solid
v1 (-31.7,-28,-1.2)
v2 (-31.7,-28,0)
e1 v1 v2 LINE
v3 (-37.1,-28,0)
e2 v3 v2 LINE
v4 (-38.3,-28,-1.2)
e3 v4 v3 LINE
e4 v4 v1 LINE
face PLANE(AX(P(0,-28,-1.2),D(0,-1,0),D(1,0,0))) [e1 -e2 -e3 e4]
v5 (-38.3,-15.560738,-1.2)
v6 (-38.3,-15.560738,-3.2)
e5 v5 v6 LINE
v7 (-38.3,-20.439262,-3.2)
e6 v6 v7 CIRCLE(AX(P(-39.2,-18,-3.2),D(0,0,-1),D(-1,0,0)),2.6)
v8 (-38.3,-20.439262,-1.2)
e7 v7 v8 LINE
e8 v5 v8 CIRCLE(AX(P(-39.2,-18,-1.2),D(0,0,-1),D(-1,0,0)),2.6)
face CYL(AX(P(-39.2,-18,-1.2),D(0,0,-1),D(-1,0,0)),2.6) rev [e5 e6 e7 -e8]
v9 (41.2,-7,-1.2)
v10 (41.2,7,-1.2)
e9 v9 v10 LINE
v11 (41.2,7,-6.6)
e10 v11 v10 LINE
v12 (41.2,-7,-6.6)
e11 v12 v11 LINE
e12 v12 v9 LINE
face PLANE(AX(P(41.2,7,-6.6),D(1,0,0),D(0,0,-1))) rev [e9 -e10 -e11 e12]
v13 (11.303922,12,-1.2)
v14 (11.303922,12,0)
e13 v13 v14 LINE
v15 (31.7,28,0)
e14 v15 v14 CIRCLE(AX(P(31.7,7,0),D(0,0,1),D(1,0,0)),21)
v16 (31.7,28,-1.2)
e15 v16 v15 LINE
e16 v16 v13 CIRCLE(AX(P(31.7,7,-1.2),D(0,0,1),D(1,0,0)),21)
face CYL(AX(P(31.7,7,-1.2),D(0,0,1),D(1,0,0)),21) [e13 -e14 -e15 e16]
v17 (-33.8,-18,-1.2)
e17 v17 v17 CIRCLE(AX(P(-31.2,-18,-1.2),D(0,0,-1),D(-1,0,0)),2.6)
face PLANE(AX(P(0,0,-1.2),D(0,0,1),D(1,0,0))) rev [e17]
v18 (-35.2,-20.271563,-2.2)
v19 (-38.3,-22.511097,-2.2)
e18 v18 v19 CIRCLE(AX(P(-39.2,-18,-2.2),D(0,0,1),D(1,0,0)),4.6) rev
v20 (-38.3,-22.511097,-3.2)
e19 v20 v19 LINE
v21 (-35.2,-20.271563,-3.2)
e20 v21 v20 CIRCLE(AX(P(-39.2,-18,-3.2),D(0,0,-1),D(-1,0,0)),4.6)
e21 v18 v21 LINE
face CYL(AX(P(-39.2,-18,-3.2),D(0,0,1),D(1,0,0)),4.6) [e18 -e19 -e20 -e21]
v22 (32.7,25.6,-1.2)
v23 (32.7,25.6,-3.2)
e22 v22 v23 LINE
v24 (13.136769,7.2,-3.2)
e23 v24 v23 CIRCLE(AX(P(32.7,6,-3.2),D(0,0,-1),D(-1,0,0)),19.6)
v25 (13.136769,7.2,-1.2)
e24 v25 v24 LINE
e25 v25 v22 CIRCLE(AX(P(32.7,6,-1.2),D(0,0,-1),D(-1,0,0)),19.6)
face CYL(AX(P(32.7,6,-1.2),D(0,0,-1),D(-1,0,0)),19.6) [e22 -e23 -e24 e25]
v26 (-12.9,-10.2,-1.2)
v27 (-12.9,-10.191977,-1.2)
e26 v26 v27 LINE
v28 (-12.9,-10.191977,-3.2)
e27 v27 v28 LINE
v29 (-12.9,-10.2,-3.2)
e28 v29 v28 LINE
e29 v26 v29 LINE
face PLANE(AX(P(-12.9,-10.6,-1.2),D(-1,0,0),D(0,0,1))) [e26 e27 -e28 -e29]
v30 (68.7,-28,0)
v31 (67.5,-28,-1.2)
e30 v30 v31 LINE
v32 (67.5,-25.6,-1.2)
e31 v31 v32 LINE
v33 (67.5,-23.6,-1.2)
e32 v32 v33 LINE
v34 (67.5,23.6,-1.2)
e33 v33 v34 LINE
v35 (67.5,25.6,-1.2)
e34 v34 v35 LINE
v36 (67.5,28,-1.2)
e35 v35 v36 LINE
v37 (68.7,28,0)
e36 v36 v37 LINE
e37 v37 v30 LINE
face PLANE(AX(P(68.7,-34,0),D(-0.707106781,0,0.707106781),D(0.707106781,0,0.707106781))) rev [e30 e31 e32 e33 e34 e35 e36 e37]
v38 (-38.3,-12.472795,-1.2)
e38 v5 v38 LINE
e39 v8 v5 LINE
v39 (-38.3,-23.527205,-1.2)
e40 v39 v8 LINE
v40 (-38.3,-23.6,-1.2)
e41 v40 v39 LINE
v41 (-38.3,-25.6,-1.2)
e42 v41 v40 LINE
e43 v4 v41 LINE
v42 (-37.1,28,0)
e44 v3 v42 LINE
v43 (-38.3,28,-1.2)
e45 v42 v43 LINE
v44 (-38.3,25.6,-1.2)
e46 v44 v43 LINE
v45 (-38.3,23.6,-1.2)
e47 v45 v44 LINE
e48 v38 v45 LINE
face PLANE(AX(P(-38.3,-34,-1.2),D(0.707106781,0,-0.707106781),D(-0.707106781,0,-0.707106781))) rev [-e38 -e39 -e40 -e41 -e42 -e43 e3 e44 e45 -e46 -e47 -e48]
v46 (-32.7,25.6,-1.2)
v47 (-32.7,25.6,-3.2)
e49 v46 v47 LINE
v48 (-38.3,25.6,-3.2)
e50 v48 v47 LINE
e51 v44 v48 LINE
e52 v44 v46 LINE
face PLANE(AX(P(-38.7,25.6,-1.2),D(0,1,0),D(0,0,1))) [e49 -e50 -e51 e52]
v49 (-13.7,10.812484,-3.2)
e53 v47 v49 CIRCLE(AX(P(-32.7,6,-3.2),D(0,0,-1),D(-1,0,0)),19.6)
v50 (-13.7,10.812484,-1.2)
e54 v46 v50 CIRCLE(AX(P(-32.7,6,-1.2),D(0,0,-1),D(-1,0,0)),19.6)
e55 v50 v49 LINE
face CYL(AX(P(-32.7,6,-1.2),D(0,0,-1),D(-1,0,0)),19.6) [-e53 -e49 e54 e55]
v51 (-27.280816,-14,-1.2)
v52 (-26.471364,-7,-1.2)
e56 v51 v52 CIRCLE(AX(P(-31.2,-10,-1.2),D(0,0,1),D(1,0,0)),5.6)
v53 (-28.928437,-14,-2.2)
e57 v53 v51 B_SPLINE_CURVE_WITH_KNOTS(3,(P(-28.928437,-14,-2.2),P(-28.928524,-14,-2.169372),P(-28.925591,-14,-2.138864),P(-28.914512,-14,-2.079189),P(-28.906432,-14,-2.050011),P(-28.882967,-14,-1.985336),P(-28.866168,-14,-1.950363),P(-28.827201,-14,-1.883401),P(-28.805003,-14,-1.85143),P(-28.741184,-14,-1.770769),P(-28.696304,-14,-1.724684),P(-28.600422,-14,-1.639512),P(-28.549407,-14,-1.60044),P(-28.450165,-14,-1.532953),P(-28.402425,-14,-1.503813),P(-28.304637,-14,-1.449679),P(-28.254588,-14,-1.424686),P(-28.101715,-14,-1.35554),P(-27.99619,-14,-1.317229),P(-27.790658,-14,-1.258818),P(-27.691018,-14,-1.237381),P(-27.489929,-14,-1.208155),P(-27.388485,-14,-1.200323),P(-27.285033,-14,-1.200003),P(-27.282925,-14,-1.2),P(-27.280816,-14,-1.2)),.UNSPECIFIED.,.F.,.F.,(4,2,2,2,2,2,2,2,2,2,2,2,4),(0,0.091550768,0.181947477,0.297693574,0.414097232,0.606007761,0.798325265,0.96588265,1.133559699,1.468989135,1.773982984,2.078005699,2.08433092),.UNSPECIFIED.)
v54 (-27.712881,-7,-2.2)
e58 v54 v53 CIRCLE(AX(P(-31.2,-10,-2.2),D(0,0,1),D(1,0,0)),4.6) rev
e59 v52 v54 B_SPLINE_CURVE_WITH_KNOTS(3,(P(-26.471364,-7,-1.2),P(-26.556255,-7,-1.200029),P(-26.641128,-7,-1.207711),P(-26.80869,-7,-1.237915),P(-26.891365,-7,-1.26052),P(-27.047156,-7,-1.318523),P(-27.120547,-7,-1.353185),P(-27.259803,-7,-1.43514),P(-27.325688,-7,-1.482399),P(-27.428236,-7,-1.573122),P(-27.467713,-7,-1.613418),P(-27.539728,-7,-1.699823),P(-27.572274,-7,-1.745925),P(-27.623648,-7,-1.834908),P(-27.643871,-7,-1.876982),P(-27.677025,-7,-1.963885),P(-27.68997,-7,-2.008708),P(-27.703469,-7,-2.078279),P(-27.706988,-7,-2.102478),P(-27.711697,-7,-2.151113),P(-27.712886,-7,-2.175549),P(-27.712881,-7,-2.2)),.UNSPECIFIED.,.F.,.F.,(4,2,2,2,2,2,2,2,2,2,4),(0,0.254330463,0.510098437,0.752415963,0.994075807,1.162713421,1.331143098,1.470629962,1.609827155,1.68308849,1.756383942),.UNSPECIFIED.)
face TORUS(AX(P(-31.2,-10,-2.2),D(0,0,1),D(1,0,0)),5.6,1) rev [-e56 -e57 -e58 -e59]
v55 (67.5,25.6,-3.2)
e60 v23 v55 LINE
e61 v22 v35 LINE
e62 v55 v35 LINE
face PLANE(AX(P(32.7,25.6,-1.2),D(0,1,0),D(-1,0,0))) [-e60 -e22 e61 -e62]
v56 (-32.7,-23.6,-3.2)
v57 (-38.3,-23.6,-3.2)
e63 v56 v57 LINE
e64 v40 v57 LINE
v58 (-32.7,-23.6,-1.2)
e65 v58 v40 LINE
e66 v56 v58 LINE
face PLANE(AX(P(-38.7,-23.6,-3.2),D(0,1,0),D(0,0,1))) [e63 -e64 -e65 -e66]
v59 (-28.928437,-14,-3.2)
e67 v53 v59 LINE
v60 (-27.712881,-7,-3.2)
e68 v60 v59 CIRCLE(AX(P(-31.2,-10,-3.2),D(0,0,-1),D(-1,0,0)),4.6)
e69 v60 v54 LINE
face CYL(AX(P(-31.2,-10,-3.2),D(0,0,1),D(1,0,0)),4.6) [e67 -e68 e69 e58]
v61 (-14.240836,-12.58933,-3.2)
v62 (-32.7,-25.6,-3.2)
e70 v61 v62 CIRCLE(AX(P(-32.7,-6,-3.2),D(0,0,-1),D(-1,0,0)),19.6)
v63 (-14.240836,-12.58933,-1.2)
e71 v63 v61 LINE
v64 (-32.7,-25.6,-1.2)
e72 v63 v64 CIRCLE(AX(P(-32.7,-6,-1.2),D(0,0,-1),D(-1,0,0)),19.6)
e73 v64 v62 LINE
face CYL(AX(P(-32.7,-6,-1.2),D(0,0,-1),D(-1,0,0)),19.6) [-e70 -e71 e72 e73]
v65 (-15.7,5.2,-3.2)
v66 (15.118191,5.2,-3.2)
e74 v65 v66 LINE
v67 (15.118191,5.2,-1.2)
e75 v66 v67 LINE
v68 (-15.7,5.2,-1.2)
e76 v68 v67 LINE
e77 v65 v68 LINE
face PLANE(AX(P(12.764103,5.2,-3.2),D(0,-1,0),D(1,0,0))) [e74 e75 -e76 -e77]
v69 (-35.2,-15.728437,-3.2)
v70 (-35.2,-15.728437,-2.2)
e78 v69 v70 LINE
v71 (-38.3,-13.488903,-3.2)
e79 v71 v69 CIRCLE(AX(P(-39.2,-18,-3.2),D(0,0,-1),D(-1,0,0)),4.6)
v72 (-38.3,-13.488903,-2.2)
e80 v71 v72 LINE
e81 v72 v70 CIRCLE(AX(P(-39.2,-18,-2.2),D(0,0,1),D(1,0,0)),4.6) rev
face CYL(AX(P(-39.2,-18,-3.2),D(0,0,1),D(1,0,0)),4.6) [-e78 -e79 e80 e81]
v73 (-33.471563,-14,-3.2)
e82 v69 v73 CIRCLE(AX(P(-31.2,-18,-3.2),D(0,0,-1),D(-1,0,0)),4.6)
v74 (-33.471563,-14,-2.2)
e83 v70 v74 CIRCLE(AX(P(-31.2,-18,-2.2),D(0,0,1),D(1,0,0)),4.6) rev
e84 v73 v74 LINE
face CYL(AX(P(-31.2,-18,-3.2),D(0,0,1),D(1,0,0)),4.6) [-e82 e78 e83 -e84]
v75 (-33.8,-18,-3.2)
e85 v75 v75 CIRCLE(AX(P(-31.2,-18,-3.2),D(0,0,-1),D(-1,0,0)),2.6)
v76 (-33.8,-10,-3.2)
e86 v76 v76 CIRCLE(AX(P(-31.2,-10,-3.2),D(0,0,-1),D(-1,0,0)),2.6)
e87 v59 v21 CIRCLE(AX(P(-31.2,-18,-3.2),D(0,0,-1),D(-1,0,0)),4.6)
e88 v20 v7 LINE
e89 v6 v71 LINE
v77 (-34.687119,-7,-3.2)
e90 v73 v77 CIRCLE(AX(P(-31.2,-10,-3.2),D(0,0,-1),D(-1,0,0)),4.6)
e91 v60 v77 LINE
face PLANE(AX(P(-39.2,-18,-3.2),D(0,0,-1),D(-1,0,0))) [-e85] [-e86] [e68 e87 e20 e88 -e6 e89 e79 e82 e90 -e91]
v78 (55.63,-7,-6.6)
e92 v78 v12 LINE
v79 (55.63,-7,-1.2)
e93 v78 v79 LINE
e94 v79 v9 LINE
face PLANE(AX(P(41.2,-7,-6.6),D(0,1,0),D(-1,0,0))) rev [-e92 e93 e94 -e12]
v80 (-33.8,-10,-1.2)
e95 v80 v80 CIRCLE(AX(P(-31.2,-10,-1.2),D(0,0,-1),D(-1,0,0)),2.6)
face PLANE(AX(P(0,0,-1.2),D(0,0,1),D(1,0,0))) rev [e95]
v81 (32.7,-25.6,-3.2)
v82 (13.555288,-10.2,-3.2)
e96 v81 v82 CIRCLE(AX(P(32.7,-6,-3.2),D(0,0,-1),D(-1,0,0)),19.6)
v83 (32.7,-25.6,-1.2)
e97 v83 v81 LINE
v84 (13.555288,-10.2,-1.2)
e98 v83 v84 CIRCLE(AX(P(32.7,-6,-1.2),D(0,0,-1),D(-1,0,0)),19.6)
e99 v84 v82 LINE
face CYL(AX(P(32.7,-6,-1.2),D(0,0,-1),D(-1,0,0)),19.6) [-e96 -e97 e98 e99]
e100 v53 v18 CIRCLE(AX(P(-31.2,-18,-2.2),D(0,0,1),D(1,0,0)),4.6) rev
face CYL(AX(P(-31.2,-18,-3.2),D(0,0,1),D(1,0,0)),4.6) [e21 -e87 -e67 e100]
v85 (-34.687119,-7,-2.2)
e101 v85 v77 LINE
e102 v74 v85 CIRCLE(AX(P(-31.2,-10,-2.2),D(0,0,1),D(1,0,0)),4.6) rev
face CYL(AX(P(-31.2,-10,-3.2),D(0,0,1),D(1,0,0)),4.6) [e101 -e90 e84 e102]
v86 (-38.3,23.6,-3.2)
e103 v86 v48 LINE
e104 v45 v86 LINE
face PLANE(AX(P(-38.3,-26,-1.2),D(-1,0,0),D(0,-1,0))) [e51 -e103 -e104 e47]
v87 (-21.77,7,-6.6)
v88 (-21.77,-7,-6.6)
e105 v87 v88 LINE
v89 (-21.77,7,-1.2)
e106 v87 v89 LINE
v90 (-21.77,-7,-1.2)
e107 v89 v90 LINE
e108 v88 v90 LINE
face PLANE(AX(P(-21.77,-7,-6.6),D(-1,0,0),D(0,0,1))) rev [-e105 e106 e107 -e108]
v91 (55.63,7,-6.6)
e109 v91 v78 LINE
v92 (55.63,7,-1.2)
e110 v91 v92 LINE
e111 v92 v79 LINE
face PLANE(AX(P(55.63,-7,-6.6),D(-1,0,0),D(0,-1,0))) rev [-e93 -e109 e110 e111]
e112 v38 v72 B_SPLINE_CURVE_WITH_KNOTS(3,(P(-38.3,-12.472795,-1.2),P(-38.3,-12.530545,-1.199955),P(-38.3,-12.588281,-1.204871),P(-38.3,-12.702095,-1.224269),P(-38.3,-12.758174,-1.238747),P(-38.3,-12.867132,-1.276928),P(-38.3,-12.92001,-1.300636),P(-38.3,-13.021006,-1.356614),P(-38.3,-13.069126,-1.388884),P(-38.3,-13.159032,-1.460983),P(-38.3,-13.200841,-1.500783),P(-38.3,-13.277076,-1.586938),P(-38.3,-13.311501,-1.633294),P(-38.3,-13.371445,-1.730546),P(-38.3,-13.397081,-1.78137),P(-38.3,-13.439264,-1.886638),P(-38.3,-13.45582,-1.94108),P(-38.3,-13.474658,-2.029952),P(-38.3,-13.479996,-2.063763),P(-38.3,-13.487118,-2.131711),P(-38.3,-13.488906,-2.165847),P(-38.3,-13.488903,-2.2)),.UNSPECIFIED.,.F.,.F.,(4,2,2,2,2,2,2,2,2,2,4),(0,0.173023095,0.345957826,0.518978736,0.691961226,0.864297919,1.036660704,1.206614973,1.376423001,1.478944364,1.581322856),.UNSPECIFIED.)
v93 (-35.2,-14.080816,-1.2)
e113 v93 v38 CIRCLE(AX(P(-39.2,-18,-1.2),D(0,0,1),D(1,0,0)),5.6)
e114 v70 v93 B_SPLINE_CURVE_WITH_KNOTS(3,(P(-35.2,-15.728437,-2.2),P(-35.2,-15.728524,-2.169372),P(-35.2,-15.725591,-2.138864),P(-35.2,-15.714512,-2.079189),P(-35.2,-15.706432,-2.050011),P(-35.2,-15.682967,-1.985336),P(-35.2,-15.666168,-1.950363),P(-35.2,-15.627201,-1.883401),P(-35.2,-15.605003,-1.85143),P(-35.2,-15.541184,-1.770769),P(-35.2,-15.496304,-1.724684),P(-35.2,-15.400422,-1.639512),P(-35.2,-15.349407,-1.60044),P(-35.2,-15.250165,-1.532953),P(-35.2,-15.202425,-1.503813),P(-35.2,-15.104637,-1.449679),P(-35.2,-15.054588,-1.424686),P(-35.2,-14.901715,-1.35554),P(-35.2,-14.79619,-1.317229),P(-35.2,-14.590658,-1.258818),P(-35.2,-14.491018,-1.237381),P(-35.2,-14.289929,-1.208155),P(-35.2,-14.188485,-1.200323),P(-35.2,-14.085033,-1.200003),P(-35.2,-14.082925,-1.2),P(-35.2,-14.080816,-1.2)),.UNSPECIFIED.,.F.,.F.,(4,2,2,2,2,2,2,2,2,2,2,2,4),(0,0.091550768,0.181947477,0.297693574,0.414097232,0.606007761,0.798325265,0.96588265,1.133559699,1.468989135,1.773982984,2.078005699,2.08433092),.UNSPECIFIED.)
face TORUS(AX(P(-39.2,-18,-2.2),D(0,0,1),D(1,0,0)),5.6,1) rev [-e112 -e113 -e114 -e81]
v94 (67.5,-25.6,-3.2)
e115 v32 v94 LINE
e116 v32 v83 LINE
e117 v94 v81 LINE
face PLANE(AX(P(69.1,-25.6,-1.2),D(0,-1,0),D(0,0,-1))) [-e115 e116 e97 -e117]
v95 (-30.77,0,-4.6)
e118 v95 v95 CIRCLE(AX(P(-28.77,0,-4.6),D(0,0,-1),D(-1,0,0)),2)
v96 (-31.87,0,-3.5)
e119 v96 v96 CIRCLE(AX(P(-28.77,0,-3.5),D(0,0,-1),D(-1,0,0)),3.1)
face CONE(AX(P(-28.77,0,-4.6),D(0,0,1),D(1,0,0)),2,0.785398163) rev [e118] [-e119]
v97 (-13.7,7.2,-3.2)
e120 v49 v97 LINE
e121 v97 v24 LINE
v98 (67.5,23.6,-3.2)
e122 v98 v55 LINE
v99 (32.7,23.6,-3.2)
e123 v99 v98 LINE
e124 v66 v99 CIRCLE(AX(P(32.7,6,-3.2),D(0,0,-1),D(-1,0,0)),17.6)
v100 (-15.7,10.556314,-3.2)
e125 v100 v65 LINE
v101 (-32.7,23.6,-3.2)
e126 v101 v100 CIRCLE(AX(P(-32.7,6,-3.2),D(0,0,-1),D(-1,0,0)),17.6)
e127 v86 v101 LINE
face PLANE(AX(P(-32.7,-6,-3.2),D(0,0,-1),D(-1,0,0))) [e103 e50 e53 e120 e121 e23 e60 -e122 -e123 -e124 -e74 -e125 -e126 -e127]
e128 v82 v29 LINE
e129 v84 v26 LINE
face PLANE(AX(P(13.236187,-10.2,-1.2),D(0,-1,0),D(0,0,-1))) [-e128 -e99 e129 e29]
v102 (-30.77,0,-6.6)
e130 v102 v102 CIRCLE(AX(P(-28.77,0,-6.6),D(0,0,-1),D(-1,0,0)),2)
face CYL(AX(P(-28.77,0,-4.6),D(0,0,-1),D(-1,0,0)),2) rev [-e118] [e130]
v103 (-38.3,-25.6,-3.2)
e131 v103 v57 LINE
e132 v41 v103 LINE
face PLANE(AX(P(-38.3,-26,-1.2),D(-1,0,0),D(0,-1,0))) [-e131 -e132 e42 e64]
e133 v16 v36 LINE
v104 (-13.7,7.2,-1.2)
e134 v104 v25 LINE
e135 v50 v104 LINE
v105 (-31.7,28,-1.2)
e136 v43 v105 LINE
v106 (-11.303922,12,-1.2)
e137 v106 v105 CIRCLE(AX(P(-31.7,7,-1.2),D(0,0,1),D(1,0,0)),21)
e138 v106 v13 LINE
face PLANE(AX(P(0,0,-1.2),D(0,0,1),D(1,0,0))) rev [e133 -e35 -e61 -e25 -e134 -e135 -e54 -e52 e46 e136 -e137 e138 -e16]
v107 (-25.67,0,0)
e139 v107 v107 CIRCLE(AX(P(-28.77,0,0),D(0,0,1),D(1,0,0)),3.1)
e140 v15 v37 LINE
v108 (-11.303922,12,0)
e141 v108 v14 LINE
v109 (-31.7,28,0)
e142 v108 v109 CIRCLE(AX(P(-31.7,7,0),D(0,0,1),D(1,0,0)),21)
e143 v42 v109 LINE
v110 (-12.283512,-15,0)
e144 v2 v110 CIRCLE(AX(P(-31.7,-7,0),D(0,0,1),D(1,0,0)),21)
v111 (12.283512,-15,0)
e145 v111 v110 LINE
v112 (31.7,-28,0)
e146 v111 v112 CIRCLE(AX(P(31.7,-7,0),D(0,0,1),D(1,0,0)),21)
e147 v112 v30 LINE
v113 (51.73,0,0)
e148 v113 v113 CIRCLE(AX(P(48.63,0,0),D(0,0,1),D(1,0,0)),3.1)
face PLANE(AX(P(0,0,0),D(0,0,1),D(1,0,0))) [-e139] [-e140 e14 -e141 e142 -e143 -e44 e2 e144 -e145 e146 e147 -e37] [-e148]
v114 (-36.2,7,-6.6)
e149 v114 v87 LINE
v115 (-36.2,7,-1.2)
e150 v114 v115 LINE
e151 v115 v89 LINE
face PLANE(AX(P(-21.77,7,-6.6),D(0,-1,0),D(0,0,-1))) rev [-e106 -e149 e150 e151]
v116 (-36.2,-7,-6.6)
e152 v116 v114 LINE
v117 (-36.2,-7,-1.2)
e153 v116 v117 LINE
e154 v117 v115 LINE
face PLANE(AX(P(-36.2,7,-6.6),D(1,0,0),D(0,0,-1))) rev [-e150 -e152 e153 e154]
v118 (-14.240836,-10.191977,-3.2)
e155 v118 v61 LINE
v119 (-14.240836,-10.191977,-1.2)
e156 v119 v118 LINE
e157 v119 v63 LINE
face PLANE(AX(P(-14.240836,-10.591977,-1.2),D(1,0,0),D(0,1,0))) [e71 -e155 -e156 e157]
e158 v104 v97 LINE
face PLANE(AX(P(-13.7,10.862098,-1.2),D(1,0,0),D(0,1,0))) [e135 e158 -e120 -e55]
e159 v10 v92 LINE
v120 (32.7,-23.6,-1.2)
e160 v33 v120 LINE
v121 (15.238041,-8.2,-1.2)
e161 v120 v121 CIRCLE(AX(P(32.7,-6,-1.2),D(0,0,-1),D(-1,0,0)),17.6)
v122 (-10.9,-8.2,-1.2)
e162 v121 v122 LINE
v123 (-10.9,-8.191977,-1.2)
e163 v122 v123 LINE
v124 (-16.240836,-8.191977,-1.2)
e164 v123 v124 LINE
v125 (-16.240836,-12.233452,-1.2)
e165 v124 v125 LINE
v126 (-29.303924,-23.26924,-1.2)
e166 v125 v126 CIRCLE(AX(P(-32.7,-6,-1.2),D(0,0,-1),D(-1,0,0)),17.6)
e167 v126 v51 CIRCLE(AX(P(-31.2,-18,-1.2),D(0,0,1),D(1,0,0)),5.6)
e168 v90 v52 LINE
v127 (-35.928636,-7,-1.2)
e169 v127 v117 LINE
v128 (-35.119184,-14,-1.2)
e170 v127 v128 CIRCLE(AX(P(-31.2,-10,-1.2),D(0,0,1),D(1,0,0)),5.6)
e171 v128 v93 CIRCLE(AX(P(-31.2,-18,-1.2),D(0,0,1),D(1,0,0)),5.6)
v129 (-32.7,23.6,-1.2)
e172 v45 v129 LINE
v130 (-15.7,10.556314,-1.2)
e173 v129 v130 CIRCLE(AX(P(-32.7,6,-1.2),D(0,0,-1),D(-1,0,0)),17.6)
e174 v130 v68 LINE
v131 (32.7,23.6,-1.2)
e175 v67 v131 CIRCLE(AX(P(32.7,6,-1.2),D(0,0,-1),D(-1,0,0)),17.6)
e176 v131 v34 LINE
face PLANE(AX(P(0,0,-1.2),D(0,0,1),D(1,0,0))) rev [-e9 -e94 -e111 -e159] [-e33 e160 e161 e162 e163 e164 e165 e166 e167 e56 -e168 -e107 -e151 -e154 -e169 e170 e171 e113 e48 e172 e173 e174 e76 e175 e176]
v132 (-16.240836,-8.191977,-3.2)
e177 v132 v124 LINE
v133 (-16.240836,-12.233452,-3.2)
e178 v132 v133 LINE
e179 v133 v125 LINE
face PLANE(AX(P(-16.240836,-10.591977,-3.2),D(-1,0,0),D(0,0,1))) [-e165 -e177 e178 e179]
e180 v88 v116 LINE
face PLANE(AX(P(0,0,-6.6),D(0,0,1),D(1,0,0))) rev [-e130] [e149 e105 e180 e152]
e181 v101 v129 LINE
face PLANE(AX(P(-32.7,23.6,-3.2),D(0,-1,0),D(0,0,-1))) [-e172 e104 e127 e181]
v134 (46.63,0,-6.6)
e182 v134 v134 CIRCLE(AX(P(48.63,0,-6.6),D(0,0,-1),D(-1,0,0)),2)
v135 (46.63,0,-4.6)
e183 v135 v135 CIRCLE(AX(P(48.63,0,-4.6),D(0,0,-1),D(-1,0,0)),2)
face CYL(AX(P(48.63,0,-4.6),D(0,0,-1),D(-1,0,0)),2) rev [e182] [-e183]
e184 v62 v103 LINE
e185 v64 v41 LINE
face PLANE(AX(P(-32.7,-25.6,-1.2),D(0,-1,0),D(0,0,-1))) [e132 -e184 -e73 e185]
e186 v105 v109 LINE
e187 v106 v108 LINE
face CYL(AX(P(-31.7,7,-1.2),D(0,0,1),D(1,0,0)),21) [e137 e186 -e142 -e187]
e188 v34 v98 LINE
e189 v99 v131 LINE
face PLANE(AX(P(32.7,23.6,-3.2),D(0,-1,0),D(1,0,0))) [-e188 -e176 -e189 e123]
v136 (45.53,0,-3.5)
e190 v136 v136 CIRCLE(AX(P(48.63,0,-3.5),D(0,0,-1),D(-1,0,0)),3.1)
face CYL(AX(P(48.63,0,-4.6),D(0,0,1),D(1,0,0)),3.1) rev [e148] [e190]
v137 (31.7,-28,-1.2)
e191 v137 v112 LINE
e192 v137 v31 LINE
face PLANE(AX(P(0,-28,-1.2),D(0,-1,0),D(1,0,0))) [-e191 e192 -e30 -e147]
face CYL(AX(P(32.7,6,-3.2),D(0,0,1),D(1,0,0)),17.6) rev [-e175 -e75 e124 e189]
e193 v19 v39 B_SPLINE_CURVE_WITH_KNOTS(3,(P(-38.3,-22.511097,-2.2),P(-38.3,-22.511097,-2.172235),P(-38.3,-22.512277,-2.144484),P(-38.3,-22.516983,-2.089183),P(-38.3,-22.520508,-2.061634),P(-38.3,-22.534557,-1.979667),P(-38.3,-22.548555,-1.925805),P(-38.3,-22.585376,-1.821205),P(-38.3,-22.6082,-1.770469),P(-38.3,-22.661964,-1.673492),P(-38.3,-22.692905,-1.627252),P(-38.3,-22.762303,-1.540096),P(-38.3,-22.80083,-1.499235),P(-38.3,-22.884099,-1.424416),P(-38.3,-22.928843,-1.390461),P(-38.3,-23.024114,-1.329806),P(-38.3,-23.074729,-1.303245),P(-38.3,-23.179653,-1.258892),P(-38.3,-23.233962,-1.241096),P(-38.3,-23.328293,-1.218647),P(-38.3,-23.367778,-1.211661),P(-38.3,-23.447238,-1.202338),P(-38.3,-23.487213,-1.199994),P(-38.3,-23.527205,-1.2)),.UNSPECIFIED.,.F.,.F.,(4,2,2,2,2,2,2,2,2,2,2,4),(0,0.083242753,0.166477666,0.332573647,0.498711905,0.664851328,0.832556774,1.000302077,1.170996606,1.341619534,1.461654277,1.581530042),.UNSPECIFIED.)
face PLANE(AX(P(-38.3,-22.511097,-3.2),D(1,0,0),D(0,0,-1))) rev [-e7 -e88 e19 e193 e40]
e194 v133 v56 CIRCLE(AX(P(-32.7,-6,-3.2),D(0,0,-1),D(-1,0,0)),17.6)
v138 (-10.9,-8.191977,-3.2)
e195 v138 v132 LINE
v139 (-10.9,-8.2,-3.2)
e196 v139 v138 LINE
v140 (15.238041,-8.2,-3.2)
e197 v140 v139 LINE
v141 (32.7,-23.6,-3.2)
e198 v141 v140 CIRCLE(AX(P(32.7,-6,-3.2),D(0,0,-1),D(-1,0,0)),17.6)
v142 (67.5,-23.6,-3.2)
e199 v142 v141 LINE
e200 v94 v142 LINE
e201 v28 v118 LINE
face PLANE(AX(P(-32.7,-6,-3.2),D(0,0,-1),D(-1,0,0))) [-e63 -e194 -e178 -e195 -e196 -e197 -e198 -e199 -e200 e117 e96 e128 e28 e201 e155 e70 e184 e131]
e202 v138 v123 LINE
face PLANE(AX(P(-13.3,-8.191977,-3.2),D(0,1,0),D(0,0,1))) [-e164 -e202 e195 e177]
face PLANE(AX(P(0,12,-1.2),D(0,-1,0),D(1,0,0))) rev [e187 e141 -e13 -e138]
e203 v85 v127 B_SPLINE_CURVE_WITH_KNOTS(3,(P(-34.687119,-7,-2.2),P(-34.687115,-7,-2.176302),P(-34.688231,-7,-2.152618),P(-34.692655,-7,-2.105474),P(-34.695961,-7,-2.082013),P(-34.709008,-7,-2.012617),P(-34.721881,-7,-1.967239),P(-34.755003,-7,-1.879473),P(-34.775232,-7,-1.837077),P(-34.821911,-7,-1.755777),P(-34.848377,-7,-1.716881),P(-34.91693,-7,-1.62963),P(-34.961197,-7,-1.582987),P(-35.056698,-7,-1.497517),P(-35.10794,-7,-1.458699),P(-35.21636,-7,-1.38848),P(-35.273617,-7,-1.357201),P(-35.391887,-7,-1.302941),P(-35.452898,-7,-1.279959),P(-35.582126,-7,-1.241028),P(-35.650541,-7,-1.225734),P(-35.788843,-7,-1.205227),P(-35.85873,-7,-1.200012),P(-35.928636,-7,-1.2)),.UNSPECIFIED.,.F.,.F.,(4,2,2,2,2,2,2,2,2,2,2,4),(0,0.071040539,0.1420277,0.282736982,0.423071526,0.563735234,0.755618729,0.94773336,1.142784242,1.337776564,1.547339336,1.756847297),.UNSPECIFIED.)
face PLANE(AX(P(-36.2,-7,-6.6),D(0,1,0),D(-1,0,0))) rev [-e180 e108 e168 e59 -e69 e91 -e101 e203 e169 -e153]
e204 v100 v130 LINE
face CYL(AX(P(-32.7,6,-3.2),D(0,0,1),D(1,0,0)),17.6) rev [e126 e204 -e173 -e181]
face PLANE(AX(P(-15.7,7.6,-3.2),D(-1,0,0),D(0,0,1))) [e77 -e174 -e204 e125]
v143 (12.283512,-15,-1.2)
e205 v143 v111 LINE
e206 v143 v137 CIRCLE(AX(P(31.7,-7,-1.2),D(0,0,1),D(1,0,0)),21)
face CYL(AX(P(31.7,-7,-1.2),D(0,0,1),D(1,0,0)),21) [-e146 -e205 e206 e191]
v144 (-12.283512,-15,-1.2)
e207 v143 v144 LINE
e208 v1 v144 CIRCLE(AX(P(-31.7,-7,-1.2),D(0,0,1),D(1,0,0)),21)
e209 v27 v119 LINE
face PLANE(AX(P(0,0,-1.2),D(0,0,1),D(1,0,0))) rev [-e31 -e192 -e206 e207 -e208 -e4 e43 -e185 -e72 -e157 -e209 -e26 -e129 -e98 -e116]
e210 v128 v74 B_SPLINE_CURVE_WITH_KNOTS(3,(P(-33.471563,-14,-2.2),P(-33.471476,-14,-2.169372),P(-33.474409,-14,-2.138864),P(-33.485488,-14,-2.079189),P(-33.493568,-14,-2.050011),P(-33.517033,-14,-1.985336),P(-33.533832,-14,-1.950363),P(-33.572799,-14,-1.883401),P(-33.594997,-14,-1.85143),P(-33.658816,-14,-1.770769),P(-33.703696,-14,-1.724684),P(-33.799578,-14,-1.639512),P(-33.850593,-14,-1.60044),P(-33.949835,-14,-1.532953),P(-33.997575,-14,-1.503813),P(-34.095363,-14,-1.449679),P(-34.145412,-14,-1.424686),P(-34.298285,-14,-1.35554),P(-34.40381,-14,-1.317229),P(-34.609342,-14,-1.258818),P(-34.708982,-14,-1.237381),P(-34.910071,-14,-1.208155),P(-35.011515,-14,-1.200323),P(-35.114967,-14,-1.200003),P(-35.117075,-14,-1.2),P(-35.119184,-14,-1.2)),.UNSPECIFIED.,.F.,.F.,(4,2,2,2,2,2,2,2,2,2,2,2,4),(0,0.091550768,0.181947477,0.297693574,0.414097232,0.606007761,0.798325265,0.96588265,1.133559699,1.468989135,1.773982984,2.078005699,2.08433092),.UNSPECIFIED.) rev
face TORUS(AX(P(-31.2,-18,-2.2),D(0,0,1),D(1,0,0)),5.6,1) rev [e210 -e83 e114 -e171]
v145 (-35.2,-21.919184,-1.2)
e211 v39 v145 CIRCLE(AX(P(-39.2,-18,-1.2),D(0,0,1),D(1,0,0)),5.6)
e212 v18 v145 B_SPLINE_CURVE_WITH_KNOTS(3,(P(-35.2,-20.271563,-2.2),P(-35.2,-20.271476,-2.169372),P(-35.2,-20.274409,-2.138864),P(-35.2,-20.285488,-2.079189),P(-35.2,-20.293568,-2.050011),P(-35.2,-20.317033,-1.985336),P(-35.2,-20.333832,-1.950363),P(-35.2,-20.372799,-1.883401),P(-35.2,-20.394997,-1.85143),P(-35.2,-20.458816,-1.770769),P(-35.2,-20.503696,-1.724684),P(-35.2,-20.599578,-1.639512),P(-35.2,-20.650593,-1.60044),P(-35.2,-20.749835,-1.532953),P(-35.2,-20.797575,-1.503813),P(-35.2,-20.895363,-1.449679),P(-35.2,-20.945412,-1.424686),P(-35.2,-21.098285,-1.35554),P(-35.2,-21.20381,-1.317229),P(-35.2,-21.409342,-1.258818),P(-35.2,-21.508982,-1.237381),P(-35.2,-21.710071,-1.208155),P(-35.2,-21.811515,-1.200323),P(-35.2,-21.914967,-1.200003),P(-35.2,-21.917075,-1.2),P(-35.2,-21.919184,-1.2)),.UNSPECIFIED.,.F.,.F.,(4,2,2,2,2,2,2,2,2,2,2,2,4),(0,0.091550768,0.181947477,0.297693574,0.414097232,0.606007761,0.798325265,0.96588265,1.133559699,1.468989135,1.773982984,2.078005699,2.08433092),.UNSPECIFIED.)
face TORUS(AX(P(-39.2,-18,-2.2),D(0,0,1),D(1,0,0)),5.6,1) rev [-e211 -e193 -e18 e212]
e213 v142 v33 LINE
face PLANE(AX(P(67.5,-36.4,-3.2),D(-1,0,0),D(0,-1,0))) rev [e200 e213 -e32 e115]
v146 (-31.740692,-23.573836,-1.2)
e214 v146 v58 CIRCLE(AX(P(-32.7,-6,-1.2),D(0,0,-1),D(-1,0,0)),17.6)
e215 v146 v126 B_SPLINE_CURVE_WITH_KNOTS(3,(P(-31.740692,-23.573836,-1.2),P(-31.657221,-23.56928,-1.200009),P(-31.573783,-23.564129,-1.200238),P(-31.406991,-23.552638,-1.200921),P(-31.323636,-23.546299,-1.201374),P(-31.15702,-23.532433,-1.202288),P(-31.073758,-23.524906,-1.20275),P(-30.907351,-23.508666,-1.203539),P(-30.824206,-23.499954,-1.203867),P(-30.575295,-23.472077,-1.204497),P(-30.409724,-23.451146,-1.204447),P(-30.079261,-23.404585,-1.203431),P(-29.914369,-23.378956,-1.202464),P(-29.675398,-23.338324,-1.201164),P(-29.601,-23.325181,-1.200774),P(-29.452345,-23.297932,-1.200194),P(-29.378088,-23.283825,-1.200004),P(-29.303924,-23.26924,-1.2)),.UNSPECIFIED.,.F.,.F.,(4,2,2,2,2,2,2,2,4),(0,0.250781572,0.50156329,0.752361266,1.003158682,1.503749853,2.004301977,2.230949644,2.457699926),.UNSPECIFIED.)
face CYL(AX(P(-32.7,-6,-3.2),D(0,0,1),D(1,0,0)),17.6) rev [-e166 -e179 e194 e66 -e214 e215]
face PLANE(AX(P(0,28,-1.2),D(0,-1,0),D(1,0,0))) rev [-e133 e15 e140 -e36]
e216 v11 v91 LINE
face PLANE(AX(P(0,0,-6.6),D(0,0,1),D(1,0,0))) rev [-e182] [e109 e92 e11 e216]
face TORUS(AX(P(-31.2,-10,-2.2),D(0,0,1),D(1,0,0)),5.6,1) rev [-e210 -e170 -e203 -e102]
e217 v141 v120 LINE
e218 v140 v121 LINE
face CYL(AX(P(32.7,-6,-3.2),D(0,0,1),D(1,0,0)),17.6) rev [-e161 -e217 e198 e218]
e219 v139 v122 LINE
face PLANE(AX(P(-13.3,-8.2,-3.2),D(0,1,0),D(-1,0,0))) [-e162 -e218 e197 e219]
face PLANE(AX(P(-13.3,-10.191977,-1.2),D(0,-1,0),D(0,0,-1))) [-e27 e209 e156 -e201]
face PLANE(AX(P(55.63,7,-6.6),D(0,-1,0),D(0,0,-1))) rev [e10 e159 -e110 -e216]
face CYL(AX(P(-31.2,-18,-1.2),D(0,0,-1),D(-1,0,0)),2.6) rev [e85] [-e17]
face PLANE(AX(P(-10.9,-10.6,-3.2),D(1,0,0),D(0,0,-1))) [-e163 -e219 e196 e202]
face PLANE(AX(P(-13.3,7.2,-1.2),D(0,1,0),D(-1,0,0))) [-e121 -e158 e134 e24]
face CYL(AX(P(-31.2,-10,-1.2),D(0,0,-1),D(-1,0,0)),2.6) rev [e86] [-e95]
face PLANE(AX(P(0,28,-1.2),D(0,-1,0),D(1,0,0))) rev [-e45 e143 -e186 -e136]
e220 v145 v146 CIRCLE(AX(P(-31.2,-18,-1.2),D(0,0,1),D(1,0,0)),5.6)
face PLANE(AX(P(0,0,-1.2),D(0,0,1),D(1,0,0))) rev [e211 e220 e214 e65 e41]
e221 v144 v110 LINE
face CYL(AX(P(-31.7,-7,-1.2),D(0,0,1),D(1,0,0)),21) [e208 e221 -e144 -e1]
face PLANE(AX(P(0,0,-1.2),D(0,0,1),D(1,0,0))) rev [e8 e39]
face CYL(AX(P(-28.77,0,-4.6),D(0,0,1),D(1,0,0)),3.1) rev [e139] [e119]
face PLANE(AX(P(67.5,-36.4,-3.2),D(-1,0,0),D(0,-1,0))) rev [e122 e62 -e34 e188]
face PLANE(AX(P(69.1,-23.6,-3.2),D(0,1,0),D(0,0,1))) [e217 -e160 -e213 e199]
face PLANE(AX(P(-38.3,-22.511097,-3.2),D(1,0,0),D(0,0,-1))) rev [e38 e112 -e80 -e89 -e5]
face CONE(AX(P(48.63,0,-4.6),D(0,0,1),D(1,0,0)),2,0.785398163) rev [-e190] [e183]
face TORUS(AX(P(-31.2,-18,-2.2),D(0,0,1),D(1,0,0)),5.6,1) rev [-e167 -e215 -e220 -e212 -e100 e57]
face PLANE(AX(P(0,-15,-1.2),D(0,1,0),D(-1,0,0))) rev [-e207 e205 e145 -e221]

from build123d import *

# Parameters (mm, degrees)
SKETCH_2_R            = 2.6
EXTRUDE_1_DEPTH       = 1.2
EXTRUDE_1_2_DEPTH     = 2
CUT_EXTRUDE_START     = -2
CUT_EXTRUDE_1_DEPTH   = 2
SKETCH_5_W            = 2
SKETCH_5_H            = 47.2
CUT_EXTRUDE_1_2_DEPTH = 2
SKETCH_6_W            = 14.43
SKETCH_6_H            = 14
SKETCH_6_R            = 2.6
EXTRUDE_2_DEPTH       = 5.4
SKETCH_7_R            = 3
SKETCH_7_R_2          = 2
EXTRUDE_2_2_DEPTH     = 2
SKETCH_8_R            = 3.1
CUT_EXTRUDE_2_DEPTH   = 4.6
CHAMFER_1_SIZE        = 1.1
SKETCH_9_R            = 4.6
SKETCH_9_R_2          = 2
EXTRUDE_3_DEPTH       = 2
SKETCH_10_R           = 2.6
SKETCH_10_R_2         = 2
CUT_EXTRUDE_2_2_DEPTH = 2
CUT_EXTRUDE_3_DEPTH   = 62
SKETCH_12_W           = 1.2
SKETCH_12_H           = 2
CUT_EXTRUDE_4_DEPTH   = 62
CUT_EXTRUDE_5_DEPTH   = 62
CUT_EXTRUDE_6_DEPTH   = 2
FILLET_1_R            = 1


# Some blends are built 0.0001 mm under size
with BuildPart() as part:
    # Эскиз2 → Extrude 1 (new body)
    with BuildSketch(Plane.XY):
        with BuildLine():
            Line((31.7, -28), (69.1, -28))
            Line((69.1, -28), (69.1, 28))
            Line((69.1, 28), (31.7, 28))
            ThreePointArc((31.7, 28), (18.738518603, 23.522711642), (11.303921946, 12))
            Line((11.303921946, 12), (10.3, 12))
            Line((10.3, 12), (-11.303921946, 12))
            ThreePointArc((-11.303921946, 12), (-18.738518603, 23.522711642), (-31.7, 28))
            Line((-31.7, 28), (-38.7, 28))
            Line((-38.7, 28), (-38.7, 0))
            Line((-38.7, 0), (-38.7, -28))
            Line((-38.7, -28), (-31.7, -28))
            ThreePointArc((-31.7, -28), (-20.016678554, -24.449928367), (-12.283512161, -15))
            Line((-12.283512161, -15), (10.3, -15))
            Line((10.3, -15), (12.283512161, -15))
            ThreePointArc((12.283512161, -15), (20.016678554, -24.449928367), (31.7, -28))
        make_face()
        with Locations((-28.77, 0)):
            Circle(SKETCH_2_R, mode=Mode.SUBTRACT)
        with Locations((48.63, 0)):
            Circle(SKETCH_2_R, mode=Mode.SUBTRACT)
    extrude(amount=-EXTRUDE_1_DEPTH)

    # Эскиз3 → Extrude 1 2 (add)
    with BuildSketch(Plane(origin=(0, 0, -1.2), x_dir=(-1, 0, 0), z_dir=(0, 0, -1))):
        with BuildLine():
            Line((-12.764102729, 7.6), (13.3, 7.6))
            Line((13.3, 7.6), (13.3, 10.862098312))
            ThreePointArc((13.3, 10.862098312), (20.39638196, 21.767719655), (32.7, 26))
            Line((32.7, 26), (38.7, 26))
            Line((38.7, 26), (38.7, -26))
            Line((38.7, -26), (32.7, -26))
            ThreePointArc((32.7, -26), (21.149339249, -22.32734627), (13.840836227, -12.658223621))
            Line((13.840836227, -12.658223621), (13.840836227, -10.59197668))
            Line((13.840836227, -10.59197668), (13.3, -10.59197668))
            Line((13.3, -10.59197668), (13.3, -10.6))
            Line((13.3, -10.6), (-13.236187424, -10.6))
            ThreePointArc((-13.236187424, -10.6), (-20.290326354, -21.684387141), (-32.7, -26))
            Line((-32.7, -26), (-69.1, -26))
            Line((-69.1, -26), (-69.1, 26))
            Line((-69.1, 26), (-32.7, 26))
            ThreePointArc((-32.7, 26), (-19.135340034, 20.696938457), (-12.764102729, 7.6))
        make_face()
        with BuildLine():
            Line((-15.118191219, 5.2), (15.7, 5.2))
            Line((15.7, 5.2), (15.7, 10.5563143))
            ThreePointArc((15.7, 10.5563143), (21.986250229, 19.963365133), (32.7, 23.6))
            Line((32.7, 23.6), (36.3, 23.6))
            Line((36.3, 23.6), (36.3, -23.6))
            Line((36.3, -23.6), (32.7, -23.6))
            ThreePointArc((32.7, -23.6), (22.698719105, -20.482209102), (16.240836227, -12.233452326))
            Line((16.240836227, -12.233452326), (16.240836227, -8.19197668))
            Line((16.240836227, -8.19197668), (10.9, -8.19197668))
            Line((10.9, -8.19197668), (10.9, -8.2))
            Line((10.9, -8.2), (-15.238041347, -8.2))
            ThreePointArc((-15.238041347, -8.2), (-21.058694231, -19.2), (-32.7, -23.6))
            Line((-32.7, -23.6), (-66.7, -23.6))
            Line((-66.7, -23.6), (-66.7, 23.6))
            Line((-66.7, 23.6), (-32.7, 23.6))
            ThreePointArc((-32.7, 23.6), (-19.975221024, 18.158947323), (-15.118191219, 5.2))
        make_face(mode=Mode.SUBTRACT)
    extrude(amount=EXTRUDE_1_2_DEPTH)

    # Эскиз4 → Cut-Extrude 1 (cut)
    with BuildSketch(Plane(origin=(0, 0, -3.2), x_dir=(-1, 0, 0), z_dir=(0, 0, -1)).offset(CUT_EXTRUDE_START)):
        with BuildLine():
            Line((-13.236187424, -10.6), (13.3, -10.6))
            Line((13.3, -10.6), (13.3, -10.59197668))
            Line((13.3, -10.59197668), (13.840836227, -10.59197668))
            Line((13.840836227, -10.59197668), (13.840836227, -12.658223621))
            ThreePointArc((13.840836227, -12.658223621), (21.149339249, -22.32734627), (32.7, -26))
            Line((32.7, -26), (38.7, -26))
            Line((38.7, -26), (38.7, 26))
            Line((38.7, 26), (32.7, 26))
            ThreePointArc((32.7, 26), (20.39638196, 21.767719655), (13.3, 10.862098312))
            Line((13.3, 10.862098312), (13.3, 7.6))
            Line((13.3, 7.6), (-12.764102729, 7.6))
            ThreePointArc((-12.764102729, 7.6), (-19.135340034, 20.696938457), (-32.7, 26))
            Line((-32.7, 26), (-69.1, 26))
            Line((-69.1, 26), (-69.1, -26))
            Line((-69.1, -26), (-32.7, -26))
            ThreePointArc((-32.7, -26), (-20.290326354, -21.684387141), (-13.236187424, -10.6))
        make_face()
        with BuildLine():
            Line((-13.555287936, -10.2), (12.9, -10.2))
            Line((12.9, -10.2), (12.9, -10.19197668))
            Line((12.9, -10.19197668), (14.240836227, -10.19197668))
            Line((14.240836227, -10.19197668), (14.240836227, -12.589330224))
            ThreePointArc((14.240836227, -12.589330224), (21.408208123, -22.020469288), (32.7, -25.6))
            Line((32.7, -25.6), (38.3, -25.6))
            Line((38.3, -25.6), (38.3, 25.6))
            Line((38.3, 25.6), (32.7, 25.6))
            ThreePointArc((32.7, 25.6), (20.661824927, 21.467460713), (13.7, 10.812483766))
            Line((13.7, 10.812483766), (13.7, 7.2))
            Line((13.7, 7.2), (-13.136769183, 7.2))
            ThreePointArc((-13.136769183, 7.2), (-19.271671735, 20.277254638), (-32.7, 25.6))
            Line((-32.7, 25.6), (-68.7, 25.6))
            Line((-68.7, 25.6), (-68.7, -25.6))
            Line((-68.7, -25.6), (-32.7, -25.6))
            ThreePointArc((-32.7, -25.6), (-20.415049858, -21.27219696), (-13.555287936, -10.2))
        make_face(mode=Mode.SUBTRACT)
    extrude(amount=CUT_EXTRUDE_1_DEPTH, mode=Mode.SUBTRACT)

    # Эскиз5 → Cut-Extrude 1 2 (cut)
    with BuildSketch(Plane(origin=(0, 0, -3.2), x_dir=(-1, 0, 0), z_dir=(0, 0, -1))):
        with Locations((-67.7, 0)):
            Rectangle(SKETCH_5_W, SKETCH_5_H)
        with Locations((37.3, 0)):
            Rectangle(SKETCH_5_W, SKETCH_5_H)
    extrude(amount=-CUT_EXTRUDE_1_2_DEPTH, mode=Mode.SUBTRACT)

    # Эскиз6 → Extrude 2 (add)
    # profile 1 of 2: a face of its own
    with BuildSketch(Plane(origin=(0, 0, -1.2), x_dir=(-1, 0, 0), z_dir=(0, 0, -1))):
        with Locations((-48.415, 0)):
            Rectangle(SKETCH_6_W, SKETCH_6_H)
        with Locations(Location((-48.63, 0, 0), (0, 0, 180))):
            Circle(SKETCH_6_R, mode=Mode.SUBTRACT)
    # profile 2 of 2: a face of its own
    with BuildSketch(Plane(origin=(0, 0, -1.2), x_dir=(-1, 0, 0), z_dir=(0, 0, -1))):
        with Locations((28.985, 0)):
            Rectangle(SKETCH_6_W, SKETCH_6_H)
        with Locations(Location((28.77, 0, 0), (0, 0, 180))):
            Circle(SKETCH_6_R, mode=Mode.SUBTRACT)
    extrude(amount=EXTRUDE_2_DEPTH)

    # Эскиз7 → Extrude 2 2 (add)
    # profile 1 of 2: a face of its own
    with BuildSketch(Plane(origin=(0, 0, -6.6), x_dir=(-1, 0, 0), z_dir=(0, 0, -1))):
        with Locations((-48.63, 0)):
            Circle(SKETCH_7_R)
        with Locations((-48.63, 0)):
            Circle(SKETCH_7_R_2, mode=Mode.SUBTRACT)
    # profile 2 of 2: a face of its own
    with BuildSketch(Plane(origin=(0, 0, -6.6), x_dir=(-1, 0, 0), z_dir=(0, 0, -1))):
        with Locations((28.77, 0)):
            Circle(SKETCH_7_R)
        with Locations((28.77, 0)):
            Circle(SKETCH_7_R_2, mode=Mode.SUBTRACT)
    extrude(amount=-EXTRUDE_2_2_DEPTH)

    # Эскиз8 → Cut-Extrude 2 (cut)
    with BuildSketch(Plane.XY):
        with Locations((-28.77, 0)):
            Circle(SKETCH_8_R)
        with Locations((48.63, 0)):
            Circle(SKETCH_8_R)
    extrude(amount=-CUT_EXTRUDE_2_DEPTH, mode=Mode.SUBTRACT)

    # Фаска1
    chamfer_1_edges = [part.edges().sort_by_distance(p)[0] for p in [
        (-31.87, 0, -4.6),
        (45.53, 0, -4.6),
    ]]
    chamfer(chamfer_1_edges, length=CHAMFER_1_SIZE - 0.0001)  # a hair under: the kernel refuses the full size

    # Эскиз9 → Вытянуть-Тонкостенный3 (add)
    # profile 1 of 3: a face of its own
    with BuildSketch(Plane(origin=(0, 0, -1.2), x_dir=(-1, 0, 0), z_dir=(0, 0, -1))):
        with Locations((39.2, -18)):
            Circle(SKETCH_9_R)
        with Locations((39.2, -18)):
            Circle(SKETCH_9_R_2, mode=Mode.SUBTRACT)
    # profile 2 of 3: a face of its own
    with BuildSketch(Plane(origin=(0, 0, -1.2), x_dir=(-1, 0, 0), z_dir=(0, 0, -1))):
        with Locations((31.2, -18)):
            Circle(SKETCH_9_R)
        with Locations((31.2, -18)):
            Circle(SKETCH_9_R_2, mode=Mode.SUBTRACT)
    # profile 3 of 3: a face of its own
    with BuildSketch(Plane(origin=(0, 0, -1.2), x_dir=(-1, 0, 0), z_dir=(0, 0, -1))):
        with Locations((31.2, -10)):
            Circle(SKETCH_9_R)
        with Locations((31.2, -10)):
            Circle(SKETCH_9_R_2, mode=Mode.SUBTRACT)
    extrude(amount=EXTRUDE_3_DEPTH)

    # Эскиз10 → Cut-Extrude 2 2 (cut)
    # profile 1 of 3: a face of its own
    with BuildSketch(Plane(origin=(0, 0, -3.2), x_dir=(-1, 0, 0), z_dir=(0, 0, -1)).offset(CUT_EXTRUDE_START)):
        with Locations((39.2, -18)):
            Circle(SKETCH_10_R)
        with Locations((39.2, -18)):
            Circle(SKETCH_10_R_2, mode=Mode.SUBTRACT)
    # profile 2 of 3: a face of its own
    with BuildSketch(Plane(origin=(0, 0, -3.2), x_dir=(-1, 0, 0), z_dir=(0, 0, -1)).offset(CUT_EXTRUDE_START)):
        with Locations((31.2, -18)):
            Circle(SKETCH_10_R)
        with Locations((31.2, -18)):
            Circle(SKETCH_10_R_2, mode=Mode.SUBTRACT)
    # profile 3 of 3: a face of its own
    with BuildSketch(Plane(origin=(0, 0, -3.2), x_dir=(-1, 0, 0), z_dir=(0, 0, -1)).offset(CUT_EXTRUDE_START)):
        with Locations((31.2, -10)):
            Circle(SKETCH_10_R)
        with Locations((31.2, -10)):
            Circle(SKETCH_10_R_2, mode=Mode.SUBTRACT)
    extrude(amount=CUT_EXTRUDE_2_2_DEPTH, mode=Mode.SUBTRACT)

    # Эскиз11 → Вырез-Вытянуть3 (cut)
    with BuildSketch(Plane(origin=(0, 28, 0), x_dir=(1, 0, 0), z_dir=(0, 1, 0))):
        Polygon((67.5, 1.2), (69.1, 1.2), (69.1, 0), (68.7, 0), align=None)
    extrude(amount=-CUT_EXTRUDE_3_DEPTH, mode=Mode.SUBTRACT)

    # Эскиз12 → Вырез-Вытянуть4 (cut)
    with BuildSketch(Plane(origin=(0, 25.6, 0), x_dir=(1, 0, 0), z_dir=(0, 1, 0))):
        with Locations((68.1, 2.2)):
            Rectangle(SKETCH_12_W, SKETCH_12_H)
    extrude(amount=-CUT_EXTRUDE_4_DEPTH, mode=Mode.SUBTRACT)

    # Эскиз13 → Вырез-Вытянуть5 (cut)
    with BuildSketch(Plane(origin=(0, 28, 0), x_dir=(1, 0, 0), z_dir=(0, 1, 0))):
        Polygon((-38.7, 1.2), (-38.3, 1.2), (-37.1, 0), (-38.7, 0), align=None)
    extrude(amount=-CUT_EXTRUDE_5_DEPTH, mode=Mode.SUBTRACT)

    # Эскиз14 → Вырез-Вытянуть6 (cut)
    with BuildSketch(Plane.XY.offset(-1.2)):
        with BuildLine():
            Line((-38.3, -15.560737816), (-38.3, -13.488902573))
            ThreePointArc((-38.3, -13.488902573), (-43.8, -18), (-38.3, -22.511097427))
            Line((-38.3, -22.511097427), (-38.3, -20.439262184))
            Line((-38.3, -20.439262184), (-38.3, -15.560737816))
        make_face()
    extrude(amount=-CUT_EXTRUDE_6_DEPTH, mode=Mode.SUBTRACT)

    # Скругление1
    # the kernel refuses this fillet: 1 mm, written as the material it adds along each edge
    with BuildSketch(Plane(origin=(-31.2, -10, -1.2), x_dir=(-0.3113315217302395, 0.9503013646086874, 0), z_dir=(0.9503013646086874, 0.3113315217302395, 0))) as fillet_1_piece_1_section:
        with BuildLine():
            CenterArc((4.6 + FILLET_1_R, -FILLET_1_R), FILLET_1_R, 90, 90)
            Line((4.6, -FILLET_1_R), (4.6, 0))
            Line((4.6, 0), (4.6 + FILLET_1_R, 0))
        make_face()
    fillet_1_piece_1 = revolve(axis=Axis((-31.2, -10, -1.2), (0, 0, 1)), revolution_arc=163.423462372, mode=Mode.PRIVATE)
    fillet_1_piece_1 = fillet_1_piece_1 - Plane(origin=(-31.2, -18, -1.484354145), x_dir=(-1, 0, 0), z_dir=(0, 0, 1)) * Cylinder(2.6, 23, mode=Mode.PRIVATE)
    add(fillet_1_piece_1)
    with BuildSketch(Plane(origin=(-31.2, -10, -1.2), x_dir=(-0.027275325587211355, -0.99962795909984, 0), z_dir=(-0.99962795909984, 0.027275325587211355, 0))) as fillet_1_piece_2_section:
        with BuildLine():
            CenterArc((4.6 + FILLET_1_R, -FILLET_1_R), FILLET_1_R, 90, 90)
            Line((4.6, -FILLET_1_R), (4.6, 0))
            Line((4.6, 0), (4.6 + FILLET_1_R, 0))
        make_face()
    fillet_1_piece_2 = revolve(axis=Axis((-31.2, -10, -1.2), (0, 0, 1)), revolution_arc=163.423462372, mode=Mode.PRIVATE)
    fillet_1_piece_2 = fillet_1_piece_2 - Plane(origin=(-31.2, -18, -1.484354149), x_dir=(-1, 0, 0), z_dir=(0, 0, 1)) * Cylinder(2.6, 23, mode=Mode.PRIVATE)
    add(fillet_1_piece_2)
    with BuildSketch(Plane(origin=(-39.2, -18, -1.2), x_dir=(0.999633679916253, 0.027064847627327897, 0), z_dir=(-0.027064847627327897, 0.999633679916253, 0))) as fillet_1_piece_3_section:
        with BuildLine():
            CenterArc((4.6 + FILLET_1_R, FILLET_1_R), FILLET_1_R, 180, 90)
            Line((4.6, FILLET_1_R), (4.6, 0))
            Line((4.6, 0), (4.6 + FILLET_1_R, 0))
        make_face()
    fillet_1_piece_3 = revolve(axis=Axis((-39.2, -18, -1.2), (0, 0, -1)), revolution_arc=111.410803348, mode=Mode.PRIVATE)
    fillet_1_piece_3 = split(fillet_1_piece_3, bisect_by=Plane(origin=(-38.3, -21.845706148, -1.420542647), z_dir=(1, 0, 0)), keep=Keep.TOP, mode=Mode.PRIVATE)
    fillet_1_piece_3 = fillet_1_piece_3 - Plane(origin=(-31.2, -18, -1.420542647), x_dir=(-1, 0, 0), z_dir=(0, 0, 1)) * Cylinder(2.6, 23, mode=Mode.PRIVATE)
    add(fillet_1_piece_3)
    with BuildSketch(Plane(origin=(-31.2, -18, -1.2), x_dir=(-0.028198782541568913, 0.9996023352629652, 0), z_dir=(-0.9996023352629652, -0.028198782541568913, 0))) as fillet_1_piece_4_section:
        with BuildLine():
            CenterArc((4.6 + FILLET_1_R, FILLET_1_R), FILLET_1_R, 180, 90)
            Line((4.6, FILLET_1_R), (4.6, 0))
            Line((4.6, 0), (4.6 + FILLET_1_R, 0))
        make_face()
    fillet_1_piece_4 = revolve(axis=Axis((-31.2, -18, -1.2), (0, 0, -1)), revolution_arc=273.231770853, mode=Mode.PRIVATE)
    fillet_1_piece_4 = fillet_1_piece_4 - Plane(origin=(-39.2, -18, -1.481900137), x_dir=(-1, 0, 0), z_dir=(0, 0, 1)) * Cylinder(2.6, 23, mode=Mode.PRIVATE)
    fillet_1_piece_4 = fillet_1_piece_4 - Plane(origin=(-31.2, -10, -1.481900137), x_dir=(-1, 0, 0), z_dir=(0, 0, 1)) * Cylinder(2.6, 23, mode=Mode.PRIVATE)
    add(fillet_1_piece_4)
    with BuildSketch(Plane(origin=(-31.2, -18, -1.2), x_dir=(-0.9996347466688219, -0.02702541863431821, 0), z_dir=(0.02702541863431821, -0.9996347466688219, 0))) as fillet_1_piece_5_section:
        with BuildLine():
            CenterArc((4.6 + FILLET_1_R, FILLET_1_R), FILLET_1_R, 180, 90)
            Line((4.6, FILLET_1_R), (4.6, 0))
            Line((4.6, 0), (4.6 + FILLET_1_R, 0))
        make_face()
    fillet_1_piece_5 = revolve(axis=Axis((-31.2, -18, -1.2), (0, 0, -1)), revolution_arc=93.097261959, mode=Mode.PRIVATE)
    fillet_1_piece_5 = fillet_1_piece_5 - Plane(origin=(-39.2, -18, -1.427452975), x_dir=(-1, 0, 0), z_dir=(0, 0, 1)) * Cylinder(2.6, 23, mode=Mode.PRIVATE)
    fillet_1_piece_5 = fillet_1_piece_5 - Plane(origin=(-31.2, -10, -1.427452975), x_dir=(-1, 0, 0), z_dir=(0, 0, 1)) * Cylinder(2.6, 23, mode=Mode.PRIVATE)
    add(fillet_1_piece_5)
    with BuildSketch(Plane(origin=(-39.2, -18, -1.2), x_dir=(-0.33972158483367015, 0.9405260468472415, 0), z_dir=(-0.9405260468472415, -0.33972158483367015, 0))) as fillet_1_piece_6_section:
        with BuildLine():
            CenterArc((4.6 + FILLET_1_R, FILLET_1_R), FILLET_1_R, 180, 90)
            Line((4.6, FILLET_1_R), (4.6, 0))
            Line((4.6, 0), (4.6 + FILLET_1_R, 0))
        make_face()
    fillet_1_piece_6 = revolve(axis=Axis((-39.2, -18, -1.2), (0, 0, -1)), revolution_arc=111.410803348, mode=Mode.PRIVATE)
    fillet_1_piece_6 = split(fillet_1_piece_6, bisect_by=Plane(origin=(-38.3, -14.15429411, -1.420542541), z_dir=(1, 0, 0)), keep=Keep.TOP, mode=Mode.PRIVATE)
    fillet_1_piece_6 = fillet_1_piece_6 - Plane(origin=(-31.2, -18, -1.420542541), x_dir=(-1, 0, 0), z_dir=(0, 0, 1)) * Cylinder(2.6, 23, mode=Mode.PRIVATE)
    add(fillet_1_piece_6)


solid = part.part
